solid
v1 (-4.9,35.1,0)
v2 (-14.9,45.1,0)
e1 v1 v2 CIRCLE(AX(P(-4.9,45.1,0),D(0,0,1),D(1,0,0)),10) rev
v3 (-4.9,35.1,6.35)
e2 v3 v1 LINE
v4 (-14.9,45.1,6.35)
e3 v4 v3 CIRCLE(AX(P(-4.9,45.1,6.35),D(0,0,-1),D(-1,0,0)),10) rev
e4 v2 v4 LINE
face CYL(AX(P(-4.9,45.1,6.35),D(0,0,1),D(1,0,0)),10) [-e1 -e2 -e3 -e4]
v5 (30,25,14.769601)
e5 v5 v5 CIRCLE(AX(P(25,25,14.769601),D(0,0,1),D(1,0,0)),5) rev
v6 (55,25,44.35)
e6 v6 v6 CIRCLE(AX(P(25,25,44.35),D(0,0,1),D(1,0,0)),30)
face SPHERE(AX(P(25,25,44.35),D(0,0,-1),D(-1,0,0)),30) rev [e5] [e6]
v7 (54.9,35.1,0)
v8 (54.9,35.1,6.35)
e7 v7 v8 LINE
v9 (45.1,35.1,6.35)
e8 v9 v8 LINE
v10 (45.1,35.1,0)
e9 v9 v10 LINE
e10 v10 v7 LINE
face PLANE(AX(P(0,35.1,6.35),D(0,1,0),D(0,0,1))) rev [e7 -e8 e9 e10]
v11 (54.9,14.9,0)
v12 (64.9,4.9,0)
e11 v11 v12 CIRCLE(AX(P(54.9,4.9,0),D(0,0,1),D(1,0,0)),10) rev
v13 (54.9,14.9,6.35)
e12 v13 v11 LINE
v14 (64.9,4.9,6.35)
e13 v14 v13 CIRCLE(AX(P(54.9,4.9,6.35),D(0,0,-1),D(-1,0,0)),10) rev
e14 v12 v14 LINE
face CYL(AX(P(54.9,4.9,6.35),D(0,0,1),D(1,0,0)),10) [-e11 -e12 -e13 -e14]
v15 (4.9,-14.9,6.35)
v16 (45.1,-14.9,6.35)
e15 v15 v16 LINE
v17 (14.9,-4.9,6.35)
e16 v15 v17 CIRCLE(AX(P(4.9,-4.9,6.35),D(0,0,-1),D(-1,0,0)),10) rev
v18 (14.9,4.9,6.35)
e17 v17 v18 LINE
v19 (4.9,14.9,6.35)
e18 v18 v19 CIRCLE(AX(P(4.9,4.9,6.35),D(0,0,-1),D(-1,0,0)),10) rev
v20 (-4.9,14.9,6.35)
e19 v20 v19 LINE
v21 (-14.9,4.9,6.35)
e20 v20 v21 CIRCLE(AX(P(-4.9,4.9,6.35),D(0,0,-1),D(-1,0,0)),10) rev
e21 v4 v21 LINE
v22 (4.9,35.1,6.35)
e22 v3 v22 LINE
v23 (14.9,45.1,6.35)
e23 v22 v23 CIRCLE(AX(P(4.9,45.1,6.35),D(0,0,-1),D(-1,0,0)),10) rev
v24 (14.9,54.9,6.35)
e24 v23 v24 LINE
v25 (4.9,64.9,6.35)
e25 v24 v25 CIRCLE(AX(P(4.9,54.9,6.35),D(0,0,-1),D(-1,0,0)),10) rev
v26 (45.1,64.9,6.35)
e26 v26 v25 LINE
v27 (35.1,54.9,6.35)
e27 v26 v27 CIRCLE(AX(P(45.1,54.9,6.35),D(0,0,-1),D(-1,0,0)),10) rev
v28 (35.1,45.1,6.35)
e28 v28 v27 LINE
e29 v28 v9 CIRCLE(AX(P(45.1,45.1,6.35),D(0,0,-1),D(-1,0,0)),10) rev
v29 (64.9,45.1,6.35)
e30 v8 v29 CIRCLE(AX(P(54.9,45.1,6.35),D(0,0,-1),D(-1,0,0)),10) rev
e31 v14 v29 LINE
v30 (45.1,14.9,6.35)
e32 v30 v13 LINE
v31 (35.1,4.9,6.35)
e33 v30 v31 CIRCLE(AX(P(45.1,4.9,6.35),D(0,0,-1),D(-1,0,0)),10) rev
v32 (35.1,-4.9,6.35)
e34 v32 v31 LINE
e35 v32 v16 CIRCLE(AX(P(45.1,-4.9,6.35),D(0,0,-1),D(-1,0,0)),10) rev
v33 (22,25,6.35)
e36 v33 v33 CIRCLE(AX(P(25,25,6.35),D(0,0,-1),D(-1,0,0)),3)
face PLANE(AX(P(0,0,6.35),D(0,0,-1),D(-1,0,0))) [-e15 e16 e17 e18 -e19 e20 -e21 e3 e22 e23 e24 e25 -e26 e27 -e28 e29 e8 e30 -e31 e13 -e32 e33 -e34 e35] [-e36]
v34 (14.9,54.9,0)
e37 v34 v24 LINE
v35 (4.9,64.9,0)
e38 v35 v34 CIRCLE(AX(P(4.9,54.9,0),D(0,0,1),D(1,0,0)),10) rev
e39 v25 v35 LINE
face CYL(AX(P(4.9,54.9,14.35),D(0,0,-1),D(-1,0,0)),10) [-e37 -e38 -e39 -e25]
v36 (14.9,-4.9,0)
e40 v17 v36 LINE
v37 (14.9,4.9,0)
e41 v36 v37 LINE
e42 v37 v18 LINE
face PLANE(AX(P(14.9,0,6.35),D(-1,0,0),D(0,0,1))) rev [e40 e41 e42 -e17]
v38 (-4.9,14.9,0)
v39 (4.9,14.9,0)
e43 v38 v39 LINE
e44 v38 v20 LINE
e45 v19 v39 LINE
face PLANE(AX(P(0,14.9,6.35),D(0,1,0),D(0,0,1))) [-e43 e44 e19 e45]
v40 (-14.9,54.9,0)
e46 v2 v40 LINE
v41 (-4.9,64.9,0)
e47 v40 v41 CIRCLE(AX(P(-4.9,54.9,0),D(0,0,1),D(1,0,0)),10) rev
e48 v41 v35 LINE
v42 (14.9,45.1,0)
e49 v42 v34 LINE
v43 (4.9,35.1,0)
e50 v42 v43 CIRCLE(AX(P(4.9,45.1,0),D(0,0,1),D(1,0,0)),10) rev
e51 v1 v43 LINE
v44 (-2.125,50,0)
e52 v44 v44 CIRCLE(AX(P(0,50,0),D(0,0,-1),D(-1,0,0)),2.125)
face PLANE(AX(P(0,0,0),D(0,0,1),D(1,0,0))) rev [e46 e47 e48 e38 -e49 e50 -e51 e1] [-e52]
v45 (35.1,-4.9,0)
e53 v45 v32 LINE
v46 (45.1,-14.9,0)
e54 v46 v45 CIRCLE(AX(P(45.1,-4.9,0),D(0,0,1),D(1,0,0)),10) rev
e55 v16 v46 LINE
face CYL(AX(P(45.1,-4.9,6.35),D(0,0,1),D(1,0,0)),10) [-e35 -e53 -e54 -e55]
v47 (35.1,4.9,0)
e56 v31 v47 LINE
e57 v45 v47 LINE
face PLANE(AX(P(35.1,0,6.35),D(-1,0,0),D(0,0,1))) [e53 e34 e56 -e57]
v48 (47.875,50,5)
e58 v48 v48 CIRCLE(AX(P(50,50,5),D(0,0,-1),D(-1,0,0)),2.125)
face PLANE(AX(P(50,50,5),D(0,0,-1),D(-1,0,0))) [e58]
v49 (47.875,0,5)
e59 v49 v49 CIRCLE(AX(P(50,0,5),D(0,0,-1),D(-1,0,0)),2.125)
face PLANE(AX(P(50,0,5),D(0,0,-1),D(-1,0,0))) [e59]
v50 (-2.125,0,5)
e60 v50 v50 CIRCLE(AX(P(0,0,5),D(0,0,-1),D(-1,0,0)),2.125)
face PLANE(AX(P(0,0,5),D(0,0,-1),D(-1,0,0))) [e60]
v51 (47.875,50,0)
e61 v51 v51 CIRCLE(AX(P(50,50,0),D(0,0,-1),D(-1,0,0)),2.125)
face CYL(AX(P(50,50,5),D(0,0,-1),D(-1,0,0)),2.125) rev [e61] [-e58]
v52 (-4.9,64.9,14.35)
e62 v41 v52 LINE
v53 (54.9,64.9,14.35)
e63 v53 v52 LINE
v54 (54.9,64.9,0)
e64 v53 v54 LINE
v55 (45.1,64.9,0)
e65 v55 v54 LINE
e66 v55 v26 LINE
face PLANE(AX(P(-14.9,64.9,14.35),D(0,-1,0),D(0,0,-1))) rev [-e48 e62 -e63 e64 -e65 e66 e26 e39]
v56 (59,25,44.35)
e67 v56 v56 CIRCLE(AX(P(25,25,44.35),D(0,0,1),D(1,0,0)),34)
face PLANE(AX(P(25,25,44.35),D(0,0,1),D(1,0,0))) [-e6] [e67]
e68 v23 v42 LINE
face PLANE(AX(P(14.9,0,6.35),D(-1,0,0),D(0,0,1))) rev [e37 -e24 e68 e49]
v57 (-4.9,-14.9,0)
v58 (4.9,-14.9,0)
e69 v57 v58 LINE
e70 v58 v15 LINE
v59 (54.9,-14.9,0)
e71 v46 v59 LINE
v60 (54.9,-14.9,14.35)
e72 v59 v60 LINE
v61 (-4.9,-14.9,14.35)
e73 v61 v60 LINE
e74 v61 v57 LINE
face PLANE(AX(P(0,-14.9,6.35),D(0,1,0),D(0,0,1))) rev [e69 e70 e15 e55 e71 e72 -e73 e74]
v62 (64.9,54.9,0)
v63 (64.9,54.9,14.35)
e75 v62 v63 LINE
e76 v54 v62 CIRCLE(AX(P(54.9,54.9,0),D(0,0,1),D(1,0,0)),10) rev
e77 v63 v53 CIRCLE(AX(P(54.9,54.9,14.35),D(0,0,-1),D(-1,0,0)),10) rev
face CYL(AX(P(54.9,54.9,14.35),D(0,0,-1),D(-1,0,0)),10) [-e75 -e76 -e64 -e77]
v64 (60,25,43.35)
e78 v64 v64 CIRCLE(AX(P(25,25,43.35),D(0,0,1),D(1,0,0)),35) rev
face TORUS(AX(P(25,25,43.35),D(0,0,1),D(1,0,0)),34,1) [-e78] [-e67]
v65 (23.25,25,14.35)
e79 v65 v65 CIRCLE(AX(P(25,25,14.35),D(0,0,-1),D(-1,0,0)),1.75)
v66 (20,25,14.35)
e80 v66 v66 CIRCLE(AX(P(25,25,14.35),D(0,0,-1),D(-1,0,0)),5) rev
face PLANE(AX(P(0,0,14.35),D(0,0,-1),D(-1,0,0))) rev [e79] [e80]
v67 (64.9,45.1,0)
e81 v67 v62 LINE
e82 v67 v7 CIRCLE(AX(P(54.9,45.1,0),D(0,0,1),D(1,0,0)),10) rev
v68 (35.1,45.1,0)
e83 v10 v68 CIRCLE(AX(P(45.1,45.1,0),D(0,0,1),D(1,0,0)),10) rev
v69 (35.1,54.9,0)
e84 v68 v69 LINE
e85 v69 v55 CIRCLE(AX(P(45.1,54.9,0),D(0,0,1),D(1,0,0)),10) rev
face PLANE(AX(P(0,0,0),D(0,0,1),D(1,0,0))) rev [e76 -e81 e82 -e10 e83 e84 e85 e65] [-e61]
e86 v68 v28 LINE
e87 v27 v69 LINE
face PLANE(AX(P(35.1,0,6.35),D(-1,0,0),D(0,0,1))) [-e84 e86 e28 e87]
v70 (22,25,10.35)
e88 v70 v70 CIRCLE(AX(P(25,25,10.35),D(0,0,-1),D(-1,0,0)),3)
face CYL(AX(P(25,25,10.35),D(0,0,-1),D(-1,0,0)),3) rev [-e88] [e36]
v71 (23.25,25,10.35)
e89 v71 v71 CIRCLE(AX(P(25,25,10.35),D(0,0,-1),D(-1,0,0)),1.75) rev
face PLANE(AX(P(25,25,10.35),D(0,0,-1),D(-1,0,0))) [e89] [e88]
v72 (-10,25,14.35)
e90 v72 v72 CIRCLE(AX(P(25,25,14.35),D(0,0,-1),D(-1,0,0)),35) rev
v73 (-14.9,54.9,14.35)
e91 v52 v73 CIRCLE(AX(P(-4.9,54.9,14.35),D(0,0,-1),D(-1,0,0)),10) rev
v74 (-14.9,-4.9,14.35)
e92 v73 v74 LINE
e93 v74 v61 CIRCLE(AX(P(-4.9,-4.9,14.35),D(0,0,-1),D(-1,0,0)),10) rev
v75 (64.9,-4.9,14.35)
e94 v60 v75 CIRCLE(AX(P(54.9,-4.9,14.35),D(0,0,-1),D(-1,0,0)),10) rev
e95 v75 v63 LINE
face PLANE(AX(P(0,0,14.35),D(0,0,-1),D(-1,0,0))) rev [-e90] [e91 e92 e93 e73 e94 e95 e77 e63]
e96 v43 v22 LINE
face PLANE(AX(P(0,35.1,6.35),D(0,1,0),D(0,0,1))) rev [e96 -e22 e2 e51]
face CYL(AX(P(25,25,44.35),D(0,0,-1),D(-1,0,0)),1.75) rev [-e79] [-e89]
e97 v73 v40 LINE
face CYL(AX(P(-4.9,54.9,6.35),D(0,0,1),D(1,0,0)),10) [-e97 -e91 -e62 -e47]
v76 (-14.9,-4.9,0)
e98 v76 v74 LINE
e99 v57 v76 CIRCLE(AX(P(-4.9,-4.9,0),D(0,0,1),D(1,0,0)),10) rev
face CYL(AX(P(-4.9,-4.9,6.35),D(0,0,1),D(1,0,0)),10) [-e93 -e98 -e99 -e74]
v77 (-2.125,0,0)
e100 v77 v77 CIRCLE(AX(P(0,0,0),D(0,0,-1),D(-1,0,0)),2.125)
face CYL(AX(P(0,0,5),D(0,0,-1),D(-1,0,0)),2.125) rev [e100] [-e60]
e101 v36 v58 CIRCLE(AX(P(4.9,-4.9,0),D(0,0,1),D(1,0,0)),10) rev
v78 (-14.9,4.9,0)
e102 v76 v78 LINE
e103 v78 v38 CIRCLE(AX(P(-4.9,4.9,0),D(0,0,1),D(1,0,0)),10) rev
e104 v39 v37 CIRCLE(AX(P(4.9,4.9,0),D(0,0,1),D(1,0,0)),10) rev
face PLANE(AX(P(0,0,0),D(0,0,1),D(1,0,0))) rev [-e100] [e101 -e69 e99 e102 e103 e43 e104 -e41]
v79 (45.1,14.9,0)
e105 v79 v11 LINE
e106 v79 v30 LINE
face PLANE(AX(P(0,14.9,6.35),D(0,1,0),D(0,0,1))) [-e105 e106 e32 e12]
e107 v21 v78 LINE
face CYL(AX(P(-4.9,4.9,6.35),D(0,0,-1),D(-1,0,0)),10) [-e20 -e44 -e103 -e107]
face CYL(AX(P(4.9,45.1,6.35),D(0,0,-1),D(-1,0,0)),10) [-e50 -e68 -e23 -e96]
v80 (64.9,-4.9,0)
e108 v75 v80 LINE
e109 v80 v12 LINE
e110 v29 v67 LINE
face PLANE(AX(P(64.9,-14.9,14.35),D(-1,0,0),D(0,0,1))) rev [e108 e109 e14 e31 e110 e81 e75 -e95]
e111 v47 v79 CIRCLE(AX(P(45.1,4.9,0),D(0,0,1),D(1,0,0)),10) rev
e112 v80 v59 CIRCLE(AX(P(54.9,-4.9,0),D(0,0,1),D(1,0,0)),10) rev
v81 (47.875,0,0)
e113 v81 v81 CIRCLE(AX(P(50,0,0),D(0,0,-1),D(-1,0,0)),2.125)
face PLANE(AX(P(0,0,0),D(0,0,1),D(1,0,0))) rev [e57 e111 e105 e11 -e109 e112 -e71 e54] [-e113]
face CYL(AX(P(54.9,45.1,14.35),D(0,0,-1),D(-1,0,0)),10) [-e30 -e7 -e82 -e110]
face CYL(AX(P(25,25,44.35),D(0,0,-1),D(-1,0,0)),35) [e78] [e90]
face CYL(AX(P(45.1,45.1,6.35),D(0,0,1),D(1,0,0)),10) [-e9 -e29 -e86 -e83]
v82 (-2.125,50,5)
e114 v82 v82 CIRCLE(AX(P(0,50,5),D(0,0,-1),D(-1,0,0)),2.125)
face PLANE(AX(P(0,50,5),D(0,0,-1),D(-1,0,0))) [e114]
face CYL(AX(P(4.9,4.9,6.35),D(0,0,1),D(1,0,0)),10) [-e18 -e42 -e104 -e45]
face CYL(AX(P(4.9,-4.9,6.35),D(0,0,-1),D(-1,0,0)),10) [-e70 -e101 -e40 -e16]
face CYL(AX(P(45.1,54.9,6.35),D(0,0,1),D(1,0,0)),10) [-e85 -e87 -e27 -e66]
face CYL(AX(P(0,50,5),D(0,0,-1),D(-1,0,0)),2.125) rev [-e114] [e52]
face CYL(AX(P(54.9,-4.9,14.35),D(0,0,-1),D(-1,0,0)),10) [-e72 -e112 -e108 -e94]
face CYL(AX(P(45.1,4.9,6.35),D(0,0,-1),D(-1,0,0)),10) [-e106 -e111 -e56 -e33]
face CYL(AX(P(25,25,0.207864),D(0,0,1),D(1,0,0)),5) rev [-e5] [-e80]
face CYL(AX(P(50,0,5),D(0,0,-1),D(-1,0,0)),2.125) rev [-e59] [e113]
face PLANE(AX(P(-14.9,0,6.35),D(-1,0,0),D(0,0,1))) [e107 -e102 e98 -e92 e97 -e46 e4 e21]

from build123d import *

# Parameters (mm, degrees)
SKETCH1_W             = 29.8
SKETCH1_H             = 29.8
BOSS_EXTRUDE1_DEPTH   = 6.35
BOSS_EXTRUDE1_2_DEPTH = 6.35
BOSS_EXTRUDE1_3_DEPTH = 6.35
BOSS_EXTRUDE1_4_DEPTH = 6.35
SKETCH2_W             = 79.8
SKETCH2_H             = 79.8
BOSS_EXTRUDE2_DEPTH   = 8
FILLET2_R             = 10
SKETCH3_R             = 35
SKETCH3_R_2           = 30
BOSS_EXTRUDE3_DEPTH   = 30
FILLET3_R             = 30
FILLET4_R             = 1
SKETCH4_R             = 2.125
CUT_EXTRUDE1_DEPTH    = 5
SKETCH6_R             = 5
CUT_EXTRUDE2_DEPTH    = 30
SKETCH7_R             = 1.75
CUT_EXTRUDE3_DEPTH    = 100.337908172
SKETCH8_R             = 3
CUT_EXTRUDE4_DEPTH    = 4


with BuildPart() as part:
    # Sketch1 → Boss-Extrude1 (new body)
    with BuildSketch(Plane.XY):
        Rectangle(SKETCH1_W, SKETCH1_H)
    extrude(amount=BOSS_EXTRUDE1_DEPTH)



with BuildPart() as body_2:
    # Sketch1 → Boss-Extrude1 2 (new body)
    with BuildSketch(Plane.XY):
        with Locations((50, 0)):
            Rectangle(SKETCH1_W, SKETCH1_H)
    extrude(amount=BOSS_EXTRUDE1_2_DEPTH)


with BuildPart() as body_3:
    # Sketch1 → Boss-Extrude1 3 (new body)
    with BuildSketch(Plane.XY):
        with Locations((50, 50)):
            Rectangle(SKETCH1_W, SKETCH1_H)
    extrude(amount=BOSS_EXTRUDE1_3_DEPTH)


with BuildPart() as body_4:
    # Sketch1 → Boss-Extrude1 4 (new body)
    with BuildSketch(Plane.XY):
        with Locations((0, 50)):
            Rectangle(SKETCH1_W, SKETCH1_H)
    extrude(amount=BOSS_EXTRUDE1_4_DEPTH)


with BuildPart() as part_1:
    add(part.part)

    add(body_2.part)  # Boss-Extrude2 merges body 2

    add(body_3.part)  # Boss-Extrude2 merges body 3

    add(body_4.part)  # Boss-Extrude2 merges body 4
    # Sketch2 → Boss-Extrude2 (add)
    with BuildSketch(Plane.XY.offset(6.35)):
        with Locations((25, 25)):
            Rectangle(SKETCH2_W, SKETCH2_H)
    extrude(amount=BOSS_EXTRUDE2_DEPTH)

    # Fillet2
    fillet2_edges = [part_1.edges().sort_by_distance(p)[0] for p in [
        (-14.9, 64.9, 7.175),
        (64.9, -14.9, 7.175),
        (64.9, 64.9, 7.175),
        (35.1, 14.9, 3.175),
        (35.1, -14.9, 3.175),
        (64.9, 14.9, 3.175),
        (35.1, 64.9, 3.175),
        (35.1, 35.1, 3.175),
        (64.9, 35.1, 3.175),
        (-14.9, 35.1, 3.175),
        (14.9, 35.1, 3.175),
        (14.9, 64.9, 3.175),
        (-14.9, 14.9, 3.175),
        (14.9, 14.9, 3.175),
        (14.9, -14.9, 3.175),
        (-14.9, -14.9, 7.175),
    ]]
    fillet(fillet2_edges, radius=FILLET2_R)

    # Sketch3 → Boss-Extrude3 (add)
    with BuildSketch(Plane.XY.offset(14.35)):
        with Locations(Location((25, 25, 0), (0, 0, 180))):
            Circle(SKETCH3_R)
        with Locations((25, 25)):
            Circle(SKETCH3_R_2, mode=Mode.SUBTRACT)
    extrude(amount=BOSS_EXTRUDE3_DEPTH)

    # Fillet3
    fillet3_edges = [part_1.edges().sort_by_distance(p)[0] for p in [
        (-5, 25, 14.35),
    ]]
    fillet(fillet3_edges, radius=FILLET3_R - 0.0001)  # a hair under: the kernel refuses the full size

    # Fillet4
    fillet4_edges = [part_1.edges().sort_by_distance(p)[0] for p in [
        (60, 25, 44.35),
    ]]
    fillet(fillet4_edges, radius=FILLET4_R)

    # Sketch4 → Cut-Extrude1 (cut)
    with BuildSketch(Plane(origin=(0, 0, 0), x_dir=(-1, 0, 0), z_dir=(0, 0, -1))):
        with Locations((0, 50)):
            Circle(SKETCH4_R)
        Circle(SKETCH4_R)
        with Locations((-50, 0)):
            Circle(SKETCH4_R)
        with Locations((-50, 50)):
            Circle(SKETCH4_R)
    extrude(amount=-CUT_EXTRUDE1_DEPTH, mode=Mode.SUBTRACT)

    # Sketch6 → Cut-Extrude2 (cut)
    with BuildSketch(Plane.XY.offset(44.35)):
        with Locations((25, 25)):
            Circle(SKETCH6_R)
    extrude(amount=-CUT_EXTRUDE2_DEPTH, mode=Mode.SUBTRACT)

    # Sketch7 → Cut-Extrude3 (cut, through all)
    with BuildSketch(Plane(origin=(0, 0, 6.35), x_dir=(-1, 0, 0), z_dir=(0, 0, -1))):
        with Locations((-25, 25)):
            Circle(SKETCH7_R)
    extrude(amount=-CUT_EXTRUDE3_DEPTH, mode=Mode.SUBTRACT)

    # Sketch8 → Cut-Extrude4 (cut)
    with BuildSketch(Plane(origin=(0, 0, 6.35), x_dir=(-1, 0, 0), z_dir=(0, 0, -1))):
        with Locations((-25, 25)):
            Circle(SKETCH8_R)
    extrude(amount=-CUT_EXTRUDE4_DEPTH, mode=Mode.SUBTRACT)


solid = part_1.part
